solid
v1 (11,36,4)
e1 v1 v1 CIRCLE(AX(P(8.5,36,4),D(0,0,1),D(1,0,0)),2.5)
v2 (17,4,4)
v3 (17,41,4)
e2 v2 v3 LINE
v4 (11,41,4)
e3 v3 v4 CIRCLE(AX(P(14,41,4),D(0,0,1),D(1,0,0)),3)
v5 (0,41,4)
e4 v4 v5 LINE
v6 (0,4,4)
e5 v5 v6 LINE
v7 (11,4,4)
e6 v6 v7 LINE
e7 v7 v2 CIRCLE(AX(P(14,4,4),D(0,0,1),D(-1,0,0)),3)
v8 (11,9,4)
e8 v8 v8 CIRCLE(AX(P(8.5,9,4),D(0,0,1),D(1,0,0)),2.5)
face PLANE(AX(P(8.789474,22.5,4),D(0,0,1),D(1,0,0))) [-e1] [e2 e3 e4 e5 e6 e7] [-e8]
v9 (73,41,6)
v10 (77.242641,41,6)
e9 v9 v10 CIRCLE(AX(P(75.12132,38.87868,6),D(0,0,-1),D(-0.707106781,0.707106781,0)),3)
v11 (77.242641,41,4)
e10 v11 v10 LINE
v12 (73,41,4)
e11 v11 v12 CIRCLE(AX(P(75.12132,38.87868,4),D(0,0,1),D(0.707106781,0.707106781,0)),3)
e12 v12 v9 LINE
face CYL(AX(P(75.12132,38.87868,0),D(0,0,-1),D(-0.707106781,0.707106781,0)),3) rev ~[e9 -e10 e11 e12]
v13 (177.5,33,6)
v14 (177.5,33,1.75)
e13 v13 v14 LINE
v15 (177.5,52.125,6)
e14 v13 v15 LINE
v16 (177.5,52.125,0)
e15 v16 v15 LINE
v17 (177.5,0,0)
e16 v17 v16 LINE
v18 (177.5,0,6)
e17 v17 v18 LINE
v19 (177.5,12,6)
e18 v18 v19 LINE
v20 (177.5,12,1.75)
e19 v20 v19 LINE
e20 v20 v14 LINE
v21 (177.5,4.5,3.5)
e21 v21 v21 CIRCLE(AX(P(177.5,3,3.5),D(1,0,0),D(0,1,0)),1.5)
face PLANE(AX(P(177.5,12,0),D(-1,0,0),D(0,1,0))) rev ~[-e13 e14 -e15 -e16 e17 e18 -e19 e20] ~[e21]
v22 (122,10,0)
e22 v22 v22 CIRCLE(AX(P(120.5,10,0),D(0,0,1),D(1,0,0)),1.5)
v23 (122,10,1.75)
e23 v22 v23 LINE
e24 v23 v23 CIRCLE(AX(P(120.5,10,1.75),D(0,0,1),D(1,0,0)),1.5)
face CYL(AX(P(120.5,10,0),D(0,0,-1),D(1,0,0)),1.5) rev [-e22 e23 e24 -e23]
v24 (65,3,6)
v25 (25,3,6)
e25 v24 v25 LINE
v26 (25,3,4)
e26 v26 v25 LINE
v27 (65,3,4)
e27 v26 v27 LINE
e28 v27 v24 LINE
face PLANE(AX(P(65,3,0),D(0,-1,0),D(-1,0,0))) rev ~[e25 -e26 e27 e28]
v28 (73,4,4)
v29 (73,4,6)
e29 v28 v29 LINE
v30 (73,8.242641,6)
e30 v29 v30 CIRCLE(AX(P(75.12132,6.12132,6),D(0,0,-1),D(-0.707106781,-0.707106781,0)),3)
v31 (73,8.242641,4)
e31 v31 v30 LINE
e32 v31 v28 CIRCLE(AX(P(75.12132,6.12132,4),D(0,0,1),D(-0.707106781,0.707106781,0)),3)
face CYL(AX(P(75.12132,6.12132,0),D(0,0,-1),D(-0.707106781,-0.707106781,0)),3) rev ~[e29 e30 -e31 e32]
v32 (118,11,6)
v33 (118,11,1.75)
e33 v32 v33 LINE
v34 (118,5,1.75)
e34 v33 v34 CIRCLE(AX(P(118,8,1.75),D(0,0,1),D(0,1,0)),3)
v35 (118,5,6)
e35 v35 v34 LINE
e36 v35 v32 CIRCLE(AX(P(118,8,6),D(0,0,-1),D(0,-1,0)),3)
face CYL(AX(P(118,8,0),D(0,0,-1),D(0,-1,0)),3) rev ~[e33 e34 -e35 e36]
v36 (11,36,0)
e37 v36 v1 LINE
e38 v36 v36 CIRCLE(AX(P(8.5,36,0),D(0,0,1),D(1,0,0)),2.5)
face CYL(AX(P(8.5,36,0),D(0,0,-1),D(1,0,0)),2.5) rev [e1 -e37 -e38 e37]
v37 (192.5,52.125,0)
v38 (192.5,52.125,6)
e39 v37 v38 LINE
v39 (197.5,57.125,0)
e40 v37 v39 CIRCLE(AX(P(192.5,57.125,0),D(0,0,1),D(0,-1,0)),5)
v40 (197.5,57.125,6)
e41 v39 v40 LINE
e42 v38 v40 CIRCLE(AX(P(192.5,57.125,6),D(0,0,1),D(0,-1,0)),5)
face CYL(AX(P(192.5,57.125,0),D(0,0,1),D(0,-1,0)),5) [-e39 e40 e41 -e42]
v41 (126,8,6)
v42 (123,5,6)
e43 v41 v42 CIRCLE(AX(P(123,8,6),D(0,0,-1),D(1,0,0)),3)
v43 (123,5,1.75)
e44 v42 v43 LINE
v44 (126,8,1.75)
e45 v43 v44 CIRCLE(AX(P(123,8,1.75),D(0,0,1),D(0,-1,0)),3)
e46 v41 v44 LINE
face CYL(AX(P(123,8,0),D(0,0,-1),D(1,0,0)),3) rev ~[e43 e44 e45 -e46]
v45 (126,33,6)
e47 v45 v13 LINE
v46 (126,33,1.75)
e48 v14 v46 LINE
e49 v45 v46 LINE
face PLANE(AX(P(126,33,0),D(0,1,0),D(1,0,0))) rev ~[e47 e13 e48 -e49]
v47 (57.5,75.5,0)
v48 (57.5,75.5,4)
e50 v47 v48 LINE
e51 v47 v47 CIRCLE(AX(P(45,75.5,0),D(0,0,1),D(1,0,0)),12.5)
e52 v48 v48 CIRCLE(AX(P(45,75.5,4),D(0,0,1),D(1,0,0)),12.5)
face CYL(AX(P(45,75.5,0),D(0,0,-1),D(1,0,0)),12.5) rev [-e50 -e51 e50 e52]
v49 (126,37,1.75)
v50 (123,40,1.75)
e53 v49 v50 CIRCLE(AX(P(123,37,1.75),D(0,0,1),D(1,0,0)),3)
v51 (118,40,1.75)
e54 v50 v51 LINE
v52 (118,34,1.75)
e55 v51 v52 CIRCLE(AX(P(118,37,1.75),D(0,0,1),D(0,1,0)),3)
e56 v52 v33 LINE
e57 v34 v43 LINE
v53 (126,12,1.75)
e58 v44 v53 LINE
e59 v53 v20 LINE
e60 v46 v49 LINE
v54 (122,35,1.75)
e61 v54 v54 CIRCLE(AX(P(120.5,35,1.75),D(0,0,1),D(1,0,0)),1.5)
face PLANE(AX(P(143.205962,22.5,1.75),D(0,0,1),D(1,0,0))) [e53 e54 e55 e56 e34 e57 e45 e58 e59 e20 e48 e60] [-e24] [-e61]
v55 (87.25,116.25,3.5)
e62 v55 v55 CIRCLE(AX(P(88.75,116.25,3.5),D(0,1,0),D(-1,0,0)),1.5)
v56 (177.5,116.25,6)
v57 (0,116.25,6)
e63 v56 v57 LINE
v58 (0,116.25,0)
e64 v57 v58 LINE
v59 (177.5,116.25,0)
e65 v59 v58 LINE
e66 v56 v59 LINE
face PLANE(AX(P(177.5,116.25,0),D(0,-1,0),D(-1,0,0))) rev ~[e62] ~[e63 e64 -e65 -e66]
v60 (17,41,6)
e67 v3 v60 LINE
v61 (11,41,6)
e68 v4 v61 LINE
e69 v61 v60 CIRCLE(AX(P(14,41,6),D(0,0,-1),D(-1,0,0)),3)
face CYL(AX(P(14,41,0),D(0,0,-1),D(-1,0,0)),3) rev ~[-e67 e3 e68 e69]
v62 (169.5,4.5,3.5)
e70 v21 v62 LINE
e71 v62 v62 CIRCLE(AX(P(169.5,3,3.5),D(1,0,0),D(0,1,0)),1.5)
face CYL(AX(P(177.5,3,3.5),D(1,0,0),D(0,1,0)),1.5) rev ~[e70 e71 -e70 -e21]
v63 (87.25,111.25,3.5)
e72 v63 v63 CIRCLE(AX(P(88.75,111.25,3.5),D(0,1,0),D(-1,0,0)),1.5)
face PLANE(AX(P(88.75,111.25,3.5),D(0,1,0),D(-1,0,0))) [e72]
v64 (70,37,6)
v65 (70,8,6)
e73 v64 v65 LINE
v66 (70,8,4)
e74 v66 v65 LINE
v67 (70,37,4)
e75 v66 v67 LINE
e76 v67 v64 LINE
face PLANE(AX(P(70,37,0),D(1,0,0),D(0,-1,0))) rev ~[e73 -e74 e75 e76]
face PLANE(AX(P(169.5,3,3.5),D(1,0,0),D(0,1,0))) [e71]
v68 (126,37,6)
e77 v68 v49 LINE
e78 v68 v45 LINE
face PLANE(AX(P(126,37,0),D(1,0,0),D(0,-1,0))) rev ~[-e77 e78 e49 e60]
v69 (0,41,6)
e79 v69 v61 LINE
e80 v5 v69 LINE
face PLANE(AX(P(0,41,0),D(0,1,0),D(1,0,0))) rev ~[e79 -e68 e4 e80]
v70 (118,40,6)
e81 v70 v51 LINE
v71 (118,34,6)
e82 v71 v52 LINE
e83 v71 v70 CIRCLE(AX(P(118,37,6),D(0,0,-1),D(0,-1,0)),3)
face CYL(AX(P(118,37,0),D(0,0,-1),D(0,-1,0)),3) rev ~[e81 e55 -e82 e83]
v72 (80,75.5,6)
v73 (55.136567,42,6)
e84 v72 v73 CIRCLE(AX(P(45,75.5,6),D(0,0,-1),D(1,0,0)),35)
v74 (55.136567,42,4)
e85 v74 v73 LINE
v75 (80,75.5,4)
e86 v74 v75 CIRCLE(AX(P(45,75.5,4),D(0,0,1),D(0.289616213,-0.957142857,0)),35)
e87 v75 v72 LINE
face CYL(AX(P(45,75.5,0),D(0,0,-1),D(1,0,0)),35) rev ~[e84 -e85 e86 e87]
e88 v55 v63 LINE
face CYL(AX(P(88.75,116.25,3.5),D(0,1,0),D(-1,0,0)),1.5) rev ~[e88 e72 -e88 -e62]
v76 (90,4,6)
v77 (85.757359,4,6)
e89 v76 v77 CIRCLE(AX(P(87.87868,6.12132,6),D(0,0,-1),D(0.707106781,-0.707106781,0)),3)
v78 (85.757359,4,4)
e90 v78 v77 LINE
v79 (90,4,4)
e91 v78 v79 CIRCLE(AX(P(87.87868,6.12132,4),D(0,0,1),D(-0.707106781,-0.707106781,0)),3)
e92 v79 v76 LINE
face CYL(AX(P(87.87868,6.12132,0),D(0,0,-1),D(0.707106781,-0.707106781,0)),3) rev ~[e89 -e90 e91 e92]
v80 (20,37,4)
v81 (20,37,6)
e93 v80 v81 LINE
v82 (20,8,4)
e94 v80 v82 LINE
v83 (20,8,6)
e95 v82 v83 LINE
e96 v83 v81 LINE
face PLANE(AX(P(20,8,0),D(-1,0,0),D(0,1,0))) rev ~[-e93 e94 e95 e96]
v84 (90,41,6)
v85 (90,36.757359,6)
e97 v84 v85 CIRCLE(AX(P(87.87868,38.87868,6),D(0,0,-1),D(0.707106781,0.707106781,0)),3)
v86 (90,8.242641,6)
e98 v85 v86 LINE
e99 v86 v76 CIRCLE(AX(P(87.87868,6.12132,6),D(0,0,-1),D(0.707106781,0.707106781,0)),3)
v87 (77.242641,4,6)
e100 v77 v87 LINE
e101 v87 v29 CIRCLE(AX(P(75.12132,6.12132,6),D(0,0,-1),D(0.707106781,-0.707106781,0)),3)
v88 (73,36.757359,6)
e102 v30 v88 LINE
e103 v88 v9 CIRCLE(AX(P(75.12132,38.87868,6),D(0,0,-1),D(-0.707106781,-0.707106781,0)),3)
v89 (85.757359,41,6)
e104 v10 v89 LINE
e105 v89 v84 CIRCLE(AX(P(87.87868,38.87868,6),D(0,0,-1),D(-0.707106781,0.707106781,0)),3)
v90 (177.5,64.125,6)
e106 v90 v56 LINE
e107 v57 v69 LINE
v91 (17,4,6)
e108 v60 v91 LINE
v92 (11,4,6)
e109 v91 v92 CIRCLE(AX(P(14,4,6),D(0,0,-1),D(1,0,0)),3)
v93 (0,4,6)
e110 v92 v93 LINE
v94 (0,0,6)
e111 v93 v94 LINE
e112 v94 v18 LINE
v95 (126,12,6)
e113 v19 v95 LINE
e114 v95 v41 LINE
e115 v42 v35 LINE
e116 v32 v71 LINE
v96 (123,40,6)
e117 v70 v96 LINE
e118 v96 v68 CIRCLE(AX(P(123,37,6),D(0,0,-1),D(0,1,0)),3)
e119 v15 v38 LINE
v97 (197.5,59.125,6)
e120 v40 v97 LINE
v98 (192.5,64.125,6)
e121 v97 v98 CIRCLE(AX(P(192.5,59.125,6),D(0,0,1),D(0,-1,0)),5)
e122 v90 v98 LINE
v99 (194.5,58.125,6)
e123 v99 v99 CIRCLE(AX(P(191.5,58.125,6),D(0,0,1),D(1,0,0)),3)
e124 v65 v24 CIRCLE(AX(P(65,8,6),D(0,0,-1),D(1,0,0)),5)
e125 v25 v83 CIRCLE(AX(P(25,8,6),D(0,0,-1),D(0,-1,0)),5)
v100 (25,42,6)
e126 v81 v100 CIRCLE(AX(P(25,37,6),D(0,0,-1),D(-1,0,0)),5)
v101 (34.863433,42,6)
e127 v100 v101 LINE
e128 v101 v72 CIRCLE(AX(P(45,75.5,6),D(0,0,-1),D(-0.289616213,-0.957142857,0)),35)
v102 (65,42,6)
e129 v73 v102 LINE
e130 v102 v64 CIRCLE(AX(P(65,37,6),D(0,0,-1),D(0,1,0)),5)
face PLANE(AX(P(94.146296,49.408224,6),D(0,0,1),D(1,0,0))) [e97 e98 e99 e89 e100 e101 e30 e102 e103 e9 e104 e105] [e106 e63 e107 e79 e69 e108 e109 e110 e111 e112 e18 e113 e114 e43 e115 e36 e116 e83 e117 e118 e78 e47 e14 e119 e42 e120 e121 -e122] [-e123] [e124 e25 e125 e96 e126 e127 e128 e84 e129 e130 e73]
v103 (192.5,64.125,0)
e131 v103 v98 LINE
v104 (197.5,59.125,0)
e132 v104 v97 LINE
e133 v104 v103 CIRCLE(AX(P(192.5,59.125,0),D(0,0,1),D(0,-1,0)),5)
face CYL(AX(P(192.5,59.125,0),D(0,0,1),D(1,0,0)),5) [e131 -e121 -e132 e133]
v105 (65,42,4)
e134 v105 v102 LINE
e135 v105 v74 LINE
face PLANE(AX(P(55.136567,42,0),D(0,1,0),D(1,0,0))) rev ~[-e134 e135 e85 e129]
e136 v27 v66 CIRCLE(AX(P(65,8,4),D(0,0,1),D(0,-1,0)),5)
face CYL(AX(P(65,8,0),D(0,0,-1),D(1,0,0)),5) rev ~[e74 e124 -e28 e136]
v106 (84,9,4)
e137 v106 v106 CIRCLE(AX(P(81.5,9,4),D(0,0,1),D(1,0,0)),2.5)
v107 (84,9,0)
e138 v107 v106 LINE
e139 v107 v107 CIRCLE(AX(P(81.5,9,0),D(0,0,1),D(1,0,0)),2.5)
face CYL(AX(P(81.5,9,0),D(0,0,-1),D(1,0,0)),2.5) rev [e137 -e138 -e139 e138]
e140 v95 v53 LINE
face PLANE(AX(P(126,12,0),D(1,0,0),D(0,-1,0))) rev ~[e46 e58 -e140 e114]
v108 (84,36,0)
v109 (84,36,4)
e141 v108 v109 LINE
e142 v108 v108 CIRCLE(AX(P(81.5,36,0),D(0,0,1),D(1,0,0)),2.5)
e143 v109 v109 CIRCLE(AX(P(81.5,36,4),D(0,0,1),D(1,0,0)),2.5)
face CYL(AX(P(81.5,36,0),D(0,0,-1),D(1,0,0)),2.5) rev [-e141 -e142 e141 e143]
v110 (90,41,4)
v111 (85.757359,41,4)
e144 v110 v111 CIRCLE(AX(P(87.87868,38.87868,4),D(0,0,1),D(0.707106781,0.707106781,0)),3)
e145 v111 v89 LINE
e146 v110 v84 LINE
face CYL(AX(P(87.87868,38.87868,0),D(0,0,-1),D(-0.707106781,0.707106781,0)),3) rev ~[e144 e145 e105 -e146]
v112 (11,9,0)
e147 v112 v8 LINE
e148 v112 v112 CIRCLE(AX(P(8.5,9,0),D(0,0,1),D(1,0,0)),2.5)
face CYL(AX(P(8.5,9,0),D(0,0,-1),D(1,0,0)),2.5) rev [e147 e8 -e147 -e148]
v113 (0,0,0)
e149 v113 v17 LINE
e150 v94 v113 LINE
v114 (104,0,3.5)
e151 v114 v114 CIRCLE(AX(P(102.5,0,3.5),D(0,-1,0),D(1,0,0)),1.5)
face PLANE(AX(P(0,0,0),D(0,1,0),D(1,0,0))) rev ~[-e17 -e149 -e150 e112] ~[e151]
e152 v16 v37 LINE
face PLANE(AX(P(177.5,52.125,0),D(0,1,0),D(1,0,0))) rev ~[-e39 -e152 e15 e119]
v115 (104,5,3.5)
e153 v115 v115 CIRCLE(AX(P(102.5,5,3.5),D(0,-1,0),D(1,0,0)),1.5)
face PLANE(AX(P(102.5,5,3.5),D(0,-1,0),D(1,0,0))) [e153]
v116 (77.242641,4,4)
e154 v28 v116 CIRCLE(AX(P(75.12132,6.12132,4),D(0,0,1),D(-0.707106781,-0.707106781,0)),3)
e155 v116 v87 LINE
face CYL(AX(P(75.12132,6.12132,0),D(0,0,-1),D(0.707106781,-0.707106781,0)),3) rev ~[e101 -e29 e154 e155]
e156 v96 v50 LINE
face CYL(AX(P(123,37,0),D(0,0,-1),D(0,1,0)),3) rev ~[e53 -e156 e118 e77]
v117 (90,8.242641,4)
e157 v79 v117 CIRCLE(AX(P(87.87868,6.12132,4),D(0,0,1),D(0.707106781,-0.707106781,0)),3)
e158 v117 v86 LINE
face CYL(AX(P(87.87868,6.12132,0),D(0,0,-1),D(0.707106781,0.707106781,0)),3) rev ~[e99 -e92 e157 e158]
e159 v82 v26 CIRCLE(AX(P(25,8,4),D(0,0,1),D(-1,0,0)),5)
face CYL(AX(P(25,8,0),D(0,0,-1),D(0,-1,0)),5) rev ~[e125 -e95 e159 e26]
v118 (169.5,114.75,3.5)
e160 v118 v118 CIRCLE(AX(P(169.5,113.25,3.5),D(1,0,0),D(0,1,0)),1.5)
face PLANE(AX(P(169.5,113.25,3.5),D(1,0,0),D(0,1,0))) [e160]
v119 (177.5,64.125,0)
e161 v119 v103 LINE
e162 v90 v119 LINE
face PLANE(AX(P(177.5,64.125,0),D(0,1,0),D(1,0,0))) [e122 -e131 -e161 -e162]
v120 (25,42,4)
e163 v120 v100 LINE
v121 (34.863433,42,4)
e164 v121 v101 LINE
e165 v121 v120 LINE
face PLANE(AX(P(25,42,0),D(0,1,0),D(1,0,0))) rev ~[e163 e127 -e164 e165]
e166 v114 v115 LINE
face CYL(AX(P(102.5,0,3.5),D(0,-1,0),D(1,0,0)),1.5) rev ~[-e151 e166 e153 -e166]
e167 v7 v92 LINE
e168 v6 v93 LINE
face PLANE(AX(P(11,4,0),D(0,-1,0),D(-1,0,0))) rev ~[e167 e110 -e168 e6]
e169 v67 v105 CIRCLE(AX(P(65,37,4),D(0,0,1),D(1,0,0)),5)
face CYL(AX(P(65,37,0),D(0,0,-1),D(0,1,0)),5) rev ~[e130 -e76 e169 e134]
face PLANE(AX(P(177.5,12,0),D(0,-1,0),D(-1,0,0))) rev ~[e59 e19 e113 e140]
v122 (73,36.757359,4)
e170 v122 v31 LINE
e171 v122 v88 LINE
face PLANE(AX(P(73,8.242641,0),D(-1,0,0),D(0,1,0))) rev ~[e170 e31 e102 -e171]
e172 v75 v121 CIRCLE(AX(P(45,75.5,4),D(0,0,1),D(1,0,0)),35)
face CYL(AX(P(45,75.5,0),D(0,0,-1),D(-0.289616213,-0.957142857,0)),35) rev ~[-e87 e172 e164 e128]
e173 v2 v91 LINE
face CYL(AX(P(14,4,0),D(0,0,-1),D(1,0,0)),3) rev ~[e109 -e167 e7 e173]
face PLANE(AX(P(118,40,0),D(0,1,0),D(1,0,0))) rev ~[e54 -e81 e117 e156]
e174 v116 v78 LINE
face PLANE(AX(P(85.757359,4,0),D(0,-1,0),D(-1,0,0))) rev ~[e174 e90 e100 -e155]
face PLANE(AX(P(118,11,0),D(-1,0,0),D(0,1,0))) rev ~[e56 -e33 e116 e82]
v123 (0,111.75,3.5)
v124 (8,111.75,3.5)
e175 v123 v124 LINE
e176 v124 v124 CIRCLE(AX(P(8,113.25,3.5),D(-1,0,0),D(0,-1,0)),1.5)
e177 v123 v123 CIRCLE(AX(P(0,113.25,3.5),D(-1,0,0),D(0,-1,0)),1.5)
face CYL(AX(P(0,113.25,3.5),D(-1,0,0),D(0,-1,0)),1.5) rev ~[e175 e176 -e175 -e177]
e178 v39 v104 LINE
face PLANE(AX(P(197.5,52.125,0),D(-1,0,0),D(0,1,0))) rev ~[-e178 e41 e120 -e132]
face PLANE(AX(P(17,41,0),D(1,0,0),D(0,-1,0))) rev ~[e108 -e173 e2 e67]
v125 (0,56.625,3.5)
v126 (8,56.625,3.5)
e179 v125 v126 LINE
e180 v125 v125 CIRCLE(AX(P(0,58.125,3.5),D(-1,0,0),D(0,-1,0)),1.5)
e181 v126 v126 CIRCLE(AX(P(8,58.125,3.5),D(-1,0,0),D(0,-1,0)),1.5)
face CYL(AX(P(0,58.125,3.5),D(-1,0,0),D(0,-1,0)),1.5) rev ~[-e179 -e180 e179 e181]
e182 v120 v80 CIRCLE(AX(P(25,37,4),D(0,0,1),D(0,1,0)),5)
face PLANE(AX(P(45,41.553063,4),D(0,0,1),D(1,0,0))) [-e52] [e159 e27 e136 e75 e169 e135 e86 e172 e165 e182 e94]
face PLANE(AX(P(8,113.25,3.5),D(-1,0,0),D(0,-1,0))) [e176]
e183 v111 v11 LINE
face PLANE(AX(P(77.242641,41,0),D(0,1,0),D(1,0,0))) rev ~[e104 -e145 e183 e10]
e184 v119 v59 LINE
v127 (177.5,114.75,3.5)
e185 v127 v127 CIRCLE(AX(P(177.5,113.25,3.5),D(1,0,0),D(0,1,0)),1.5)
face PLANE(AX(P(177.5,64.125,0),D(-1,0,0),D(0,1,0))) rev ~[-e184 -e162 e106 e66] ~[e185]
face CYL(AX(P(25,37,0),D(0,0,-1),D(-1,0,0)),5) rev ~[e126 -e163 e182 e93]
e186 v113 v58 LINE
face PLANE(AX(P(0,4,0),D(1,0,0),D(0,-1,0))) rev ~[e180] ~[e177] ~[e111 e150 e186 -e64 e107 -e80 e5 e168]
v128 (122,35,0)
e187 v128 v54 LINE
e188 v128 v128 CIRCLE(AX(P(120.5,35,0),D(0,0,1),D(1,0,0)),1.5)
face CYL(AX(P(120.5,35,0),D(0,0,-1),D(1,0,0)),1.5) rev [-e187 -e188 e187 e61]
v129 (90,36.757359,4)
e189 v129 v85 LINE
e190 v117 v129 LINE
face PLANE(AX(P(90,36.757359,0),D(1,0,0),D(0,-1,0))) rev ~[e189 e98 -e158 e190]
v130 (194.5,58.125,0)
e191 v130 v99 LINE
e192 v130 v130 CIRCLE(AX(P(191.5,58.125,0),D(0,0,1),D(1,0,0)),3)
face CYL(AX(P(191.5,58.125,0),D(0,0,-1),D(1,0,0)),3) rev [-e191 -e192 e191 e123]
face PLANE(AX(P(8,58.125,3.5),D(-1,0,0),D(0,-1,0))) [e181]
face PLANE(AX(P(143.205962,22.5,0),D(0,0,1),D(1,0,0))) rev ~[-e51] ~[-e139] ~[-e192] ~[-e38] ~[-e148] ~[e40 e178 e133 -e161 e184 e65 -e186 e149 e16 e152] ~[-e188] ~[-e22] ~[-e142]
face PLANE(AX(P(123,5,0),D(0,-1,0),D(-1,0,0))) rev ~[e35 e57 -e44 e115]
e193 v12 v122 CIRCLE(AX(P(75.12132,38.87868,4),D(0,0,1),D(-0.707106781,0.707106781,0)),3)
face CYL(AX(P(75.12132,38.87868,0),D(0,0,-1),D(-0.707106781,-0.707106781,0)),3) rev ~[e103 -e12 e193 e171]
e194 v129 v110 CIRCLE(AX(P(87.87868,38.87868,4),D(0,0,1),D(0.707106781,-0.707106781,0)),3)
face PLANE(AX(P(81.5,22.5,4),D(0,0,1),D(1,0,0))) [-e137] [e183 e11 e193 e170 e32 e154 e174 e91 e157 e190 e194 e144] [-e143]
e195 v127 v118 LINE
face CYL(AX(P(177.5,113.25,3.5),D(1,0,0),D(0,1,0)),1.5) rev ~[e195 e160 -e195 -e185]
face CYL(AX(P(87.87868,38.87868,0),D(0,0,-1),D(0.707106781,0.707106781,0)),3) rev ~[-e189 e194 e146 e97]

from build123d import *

# Parameters (mm, degrees)
F0_W      = 20
F0_H      = 12
F0_R      = 3
F1_DEPTH  = 6
F0_R_2    = 12.5
F0_R_3    = 2.5
F2_DEPTH  = 4
F3_DEPTH  = 2
F4_DEPTH  = 3
F0_R_4    = 1.5
F5_DEPTH  = 1.75
F6_R      = 1.5
F7_DEPTH  = 8
F8_R      = 1.5
F9_DEPTH  = 8
F10_R     = 1.5
F11_DEPTH = 5
F12_R     = 1.5
F13_DEPTH = 5
F14_R     = 5


# Not quite as in the source:
# - a feature names something its author has since deleted; it is built from what else it names


with BuildPart() as f1:
    # F0 (on Top) → F1 (new body)
    with BuildSketch(Plane.XY):
        with BuildLine():
            Line((0, 4), (0, 0))
            Line((0, 0), (177.5, 0))
            Line((177.5, 0), (177.5, 5))
            Line((177.5, 5), (177.5, 12))
            Line((177.5, 12), (126, 12))
            Line((126, 12), (126, 8))
            ThreePointArc((126, 8), (125.1213203436, 5.8786796564), (123, 5))
            Line((123, 5), (118, 5))
            ThreePointArc((118, 5), (115, 8), (118, 11))
            Line((118, 11), (118, 34))
            ThreePointArc((118, 34), (115, 37), (118, 40))
            Line((118, 40), (123, 40))
            ThreePointArc((123, 40), (125.1213203436, 39.1213203436), (126, 37))
            Line((126, 37), (126, 33))
            Line((126, 33), (177.5, 33))
            Line((177.5, 33), (177.5, 40))
            Line((177.5, 40), (177.5, 52.125))
            Line((177.5, 52.125), (177.5, 64.125))
            Line((177.5, 64.125), (177.5, 116.25))
            Line((177.5, 116.25), (0, 116.25))
            Line((0, 116.25), (0, 41))
            Line((0, 41), (11, 41))
            ThreePointArc((11, 41), (14, 44), (17, 41))
            Line((17, 41), (17, 4))
            ThreePointArc((17, 4), (14, 1), (11, 4))
            Line((11, 4), (0, 4))
        make_face()
        with BuildLine():
            Line((73, 8.2426406871), (73, 36.7573593129))
            ThreePointArc((73, 36.7573593129), (72.1213203436, 38.8786796564), (73, 41))
            ThreePointArc((73, 41), (75.1213203436, 41.8786796564), (77.2426406871, 41))
            Line((77.2426406871, 41), (85.7573593129, 41))
            ThreePointArc((85.7573593129, 41), (87.8786796564, 41.8786796564), (90, 41))
            ThreePointArc((90, 41), (90.8786796564, 38.8786796564), (90, 36.7573593129))
            Line((90, 36.7573593129), (90, 8.2426406871))
            ThreePointArc((90, 8.2426406871), (90.8786796564, 6.1213203436), (90, 4))
            ThreePointArc((90, 4), (87.8786796564, 3.1213203436), (85.7573593129, 4))
            Line((85.7573593129, 4), (77.2426406871, 4))
            ThreePointArc((77.2426406871, 4), (75.1213203436, 3.1213203436), (73, 4))
            ThreePointArc((73, 4), (72.1213203436, 6.1213203436), (73, 8.2426406871))
        make_face(mode=Mode.SUBTRACT)
        with BuildLine():
            ThreePointArc((34.8634325336, 42), (24.1407078419, 103.6049805312), (80, 75.5))
            ThreePointArc((80, 75.5), (73.1049805312, 54.6407078419), (55.1365674664, 42))
            Line((55.1365674664, 42), (65, 42))
            ThreePointArc((65, 42), (68.5355339059, 40.5355339059), (70, 37))
            Line((70, 37), (70, 8))
            ThreePointArc((70, 8), (68.5355339059, 4.4644660941), (65, 3))
            Line((65, 3), (25, 3))
            ThreePointArc((25, 3), (21.4644660941, 4.4644660941), (20, 8))
            Line((20, 8), (20, 37))
            ThreePointArc((20, 37), (21.4644660941, 40.5355339059), (25, 42))
            Line((25, 42), (34.8634325336, 42))
        make_face(mode=Mode.SUBTRACT)
        with Locations((187.5, 58.125)):
            Rectangle(F0_W, F0_H)
        with Locations((191.5, 58.125)):
            Circle(F0_R, mode=Mode.SUBTRACT)
    extrude(amount=F1_DEPTH)

    # F0 (on Top) → F2 (join)
    with BuildSketch(Plane.XY):
        with BuildLine():
            Line((55.1365674664, 42), (34.8634325336, 42))
            ThreePointArc((34.8634325336, 42), (45, 40.5), (55.1365674664, 42))
        make_face()
        with BuildLine():
            ThreePointArc((55.1365674664, 42), (73.1049805312, 54.6407078419), (80, 75.5))
            ThreePointArc((80, 75.5), (24.1407078419, 103.6049805312), (34.8634325336, 42))
            Line((34.8634325336, 42), (55.1365674664, 42))
        make_face()
        with Locations((45, 75.5)):
            Circle(F0_R_2, mode=Mode.SUBTRACT)
        with BuildLine():
            Line((0, 41), (0, 4))
            Line((0, 4), (11, 4))
            ThreePointArc((11, 4), (14, 1), (17, 4))
            Line((17, 4), (17, 41))
            ThreePointArc((17, 41), (14, 44), (11, 41))
            Line((11, 41), (0, 41))
        make_face()
        with Locations((8.5, 9)):
            Circle(F0_R_3, mode=Mode.SUBTRACT)
        with Locations((8.5, 36)):
            Circle(F0_R_3, mode=Mode.SUBTRACT)
        with BuildLine():
            ThreePointArc((73, 41), (72.1213203436, 38.8786796564), (73, 36.7573593129))
            Line((73, 36.7573593129), (73, 8.2426406871))
            ThreePointArc((73, 8.2426406871), (72.1213203436, 6.1213203436), (73, 4))
            ThreePointArc((73, 4), (75.1213203436, 3.1213203436), (77.2426406871, 4))
            Line((77.2426406871, 4), (85.7573593129, 4))
            ThreePointArc((85.7573593129, 4), (87.8786796564, 3.1213203436), (90, 4))
            ThreePointArc((90, 4), (90.8786796564, 6.1213203436), (90, 8.2426406871))
            Line((90, 8.2426406871), (90, 36.7573593129))
            ThreePointArc((90, 36.7573593129), (90.8786796564, 38.8786796564), (90, 41))
            ThreePointArc((90, 41), (87.8786796564, 41.8786796564), (85.7573593129, 41))
            Line((85.7573593129, 41), (77.2426406871, 41))
            ThreePointArc((77.2426406871, 41), (75.1213203436, 41.8786796564), (73, 41))
        make_face()
        with Locations((81.5, 9)):
            Circle(F0_R_3, mode=Mode.SUBTRACT)
        with Locations((81.5, 36)):
            Circle(F0_R_3, mode=Mode.SUBTRACT)
        with BuildLine():
            ThreePointArc((55.1365674664, 42), (45, 40.5), (34.8634325336, 42))
            Line((34.8634325336, 42), (25, 42))
            ThreePointArc((25, 42), (21.4644660941, 40.5355339059), (20, 37))
            Line((20, 37), (20, 8))
            ThreePointArc((20, 8), (21.4644660941, 4.4644660941), (25, 3))
            Line((25, 3), (65, 3))
            ThreePointArc((65, 3), (68.5355339059, 4.4644660941), (70, 8))
            Line((70, 8), (70, 37))
            ThreePointArc((70, 37), (68.5355339059, 40.5355339059), (65, 42))
            Line((65, 42), (55.1365674664, 42))
        make_face()
    extrude(amount=F2_DEPTH)

    # F0 (on Top) → F3 (join)
    with BuildSketch(Plane.XY):
        with BuildLine():
            ThreePointArc((55.1365674664, 42), (45, 40.5), (34.8634325336, 42))
            Line((34.8634325336, 42), (25, 42))
            ThreePointArc((25, 42), (21.4644660941, 40.5355339059), (20, 37))
            Line((20, 37), (20, 8))
            ThreePointArc((20, 8), (21.4644660941, 4.4644660941), (25, 3))
            Line((25, 3), (65, 3))
            ThreePointArc((65, 3), (68.5355339059, 4.4644660941), (70, 8))
            Line((70, 8), (70, 37))
            ThreePointArc((70, 37), (68.5355339059, 40.5355339059), (65, 42))
            Line((65, 42), (55.1365674664, 42))
        make_face()
    extrude(amount=F3_DEPTH)

    # F0 (on Top) → F4 (join)
    with BuildSketch(Plane.XY):
        with BuildLine():
            Line((0, 41), (0, 4))
            Line((0, 4), (11, 4))
            ThreePointArc((11, 4), (14, 1), (17, 4))
            Line((17, 4), (17, 41))
            ThreePointArc((17, 41), (14, 44), (11, 41))
            Line((11, 41), (0, 41))
        make_face()
        with Locations((8.5, 9)):
            Circle(F0_R_3, mode=Mode.SUBTRACT)
        with Locations((8.5, 36)):
            Circle(F0_R_3, mode=Mode.SUBTRACT)
        with BuildLine():
            Line((0, 4), (0, 0))
            Line((0, 0), (177.5, 0))
            Line((177.5, 0), (177.5, 5))
            Line((177.5, 5), (177.5, 12))
            Line((177.5, 12), (126, 12))
            Line((126, 12), (126, 8))
            ThreePointArc((126, 8), (125.1213203436, 5.8786796564), (123, 5))
            Line((123, 5), (118, 5))
            ThreePointArc((118, 5), (115, 8), (118, 11))
            Line((118, 11), (118, 34))
            ThreePointArc((118, 34), (115, 37), (118, 40))
            Line((118, 40), (123, 40))
            ThreePointArc((123, 40), (125.1213203436, 39.1213203436), (126, 37))
            Line((126, 37), (126, 33))
            Line((126, 33), (177.5, 33))
            Line((177.5, 33), (177.5, 40))
            Line((177.5, 40), (177.5, 52.125))
            Line((177.5, 52.125), (177.5, 64.125))
            Line((177.5, 64.125), (177.5, 116.25))
            Line((177.5, 116.25), (0, 116.25))
            Line((0, 116.25), (0, 41))
            Line((0, 41), (11, 41))
            ThreePointArc((11, 41), (14, 44), (17, 41))
            Line((17, 41), (17, 4))
            ThreePointArc((17, 4), (14, 1), (11, 4))
            Line((11, 4), (0, 4))
        make_face()
        with BuildLine():
            Line((73, 8.2426406871), (73, 36.7573593129))
            ThreePointArc((73, 36.7573593129), (72.1213203436, 38.8786796564), (73, 41))
            ThreePointArc((73, 41), (75.1213203436, 41.8786796564), (77.2426406871, 41))
            Line((77.2426406871, 41), (85.7573593129, 41))
            ThreePointArc((85.7573593129, 41), (87.8786796564, 41.8786796564), (90, 41))
            ThreePointArc((90, 41), (90.8786796564, 38.8786796564), (90, 36.7573593129))
            Line((90, 36.7573593129), (90, 8.2426406871))
            ThreePointArc((90, 8.2426406871), (90.8786796564, 6.1213203436), (90, 4))
            ThreePointArc((90, 4), (87.8786796564, 3.1213203436), (85.7573593129, 4))
            Line((85.7573593129, 4), (77.2426406871, 4))
            ThreePointArc((77.2426406871, 4), (75.1213203436, 3.1213203436), (73, 4))
            ThreePointArc((73, 4), (72.1213203436, 6.1213203436), (73, 8.2426406871))
        make_face(mode=Mode.SUBTRACT)
        with BuildLine():
            ThreePointArc((34.8634325336, 42), (24.1407078419, 103.6049805312), (80, 75.5))
            ThreePointArc((80, 75.5), (73.1049805312, 54.6407078419), (55.1365674664, 42))
            Line((55.1365674664, 42), (65, 42))
            ThreePointArc((65, 42), (68.5355339059, 40.5355339059), (70, 37))
            Line((70, 37), (70, 8))
            ThreePointArc((70, 8), (68.5355339059, 4.4644660941), (65, 3))
            Line((65, 3), (25, 3))
            ThreePointArc((25, 3), (21.4644660941, 4.4644660941), (20, 8))
            Line((20, 8), (20, 37))
            ThreePointArc((20, 37), (21.4644660941, 40.5355339059), (25, 42))
            Line((25, 42), (34.8634325336, 42))
        make_face(mode=Mode.SUBTRACT)
    extrude(amount=F4_DEPTH)

    # F0 (on Top) → F5 (join)
    with BuildSketch(Plane.XY):
        with BuildLine():
            Line((126, 12), (177.5, 12))
            Line((177.5, 12), (177.5, 33))
            Line((177.5, 33), (126, 33))
            Line((126, 33), (126, 37))
            ThreePointArc((126, 37), (125.1213203436, 39.1213203436), (123, 40))
            Line((123, 40), (118, 40))
            ThreePointArc((118, 40), (115, 37), (118, 34))
            Line((118, 34), (118, 11))
            ThreePointArc((118, 11), (115, 8), (118, 5))
            Line((118, 5), (123, 5))
            ThreePointArc((123, 5), (125.1213203436, 5.8786796564), (126, 8))
            Line((126, 8), (126, 12))
        make_face()
        with Locations((120.5, 10)):
            Circle(F0_R_4, mode=Mode.SUBTRACT)
        with Locations((120.5, 35)):
            Circle(F0_R_4, mode=Mode.SUBTRACT)
    extrude(amount=F5_DEPTH)

    # F6 (on face) → F7 (cut)
    with BuildSketch(Plane.YZ.offset(177.5)):
        with Locations((3, 3.5)):
            Circle(F6_R)
        with Locations((113.25, 3.5)):
            Circle(F6_R)
    extrude(amount=-F7_DEPTH, mode=Mode.SUBTRACT)

    # F8 (on face) → F9 (cut)
    with BuildSketch(Plane(origin=(0, 0, 0), x_dir=(0, -1, 0), z_dir=(-1, 0, 0))):
        with Locations((-113.25, 3.5)):
            Circle(F8_R)
        with Locations((-58.125, 3.5)):
            Circle(F8_R)
    extrude(amount=-F9_DEPTH, mode=Mode.SUBTRACT)

    # F10 (on face) → F11 (cut)
    with BuildSketch(Plane.XZ):
        with Locations((102.5, 3.5)):
            Circle(F10_R)
    extrude(amount=-F11_DEPTH, mode=Mode.SUBTRACT)

    # F12 (on face) → F13 (cut)
    with BuildSketch(Plane(origin=(0, 116.25, 0), x_dir=(-1, 0, 0), z_dir=(0, 1, 0))):
        with Locations((-88.75, 3.5)):
            Circle(F12_R)
    extrude(amount=-F13_DEPTH, mode=Mode.SUBTRACT)

    # F14
    f14_edges = [f1.edges().sort_by_distance(p)[0] for p in [
        (197.5, 52.125, 3),
        (197.5, 64.125, 3),
    ]]
    fillet(f14_edges, radius=F14_R)


solid = f1.part
